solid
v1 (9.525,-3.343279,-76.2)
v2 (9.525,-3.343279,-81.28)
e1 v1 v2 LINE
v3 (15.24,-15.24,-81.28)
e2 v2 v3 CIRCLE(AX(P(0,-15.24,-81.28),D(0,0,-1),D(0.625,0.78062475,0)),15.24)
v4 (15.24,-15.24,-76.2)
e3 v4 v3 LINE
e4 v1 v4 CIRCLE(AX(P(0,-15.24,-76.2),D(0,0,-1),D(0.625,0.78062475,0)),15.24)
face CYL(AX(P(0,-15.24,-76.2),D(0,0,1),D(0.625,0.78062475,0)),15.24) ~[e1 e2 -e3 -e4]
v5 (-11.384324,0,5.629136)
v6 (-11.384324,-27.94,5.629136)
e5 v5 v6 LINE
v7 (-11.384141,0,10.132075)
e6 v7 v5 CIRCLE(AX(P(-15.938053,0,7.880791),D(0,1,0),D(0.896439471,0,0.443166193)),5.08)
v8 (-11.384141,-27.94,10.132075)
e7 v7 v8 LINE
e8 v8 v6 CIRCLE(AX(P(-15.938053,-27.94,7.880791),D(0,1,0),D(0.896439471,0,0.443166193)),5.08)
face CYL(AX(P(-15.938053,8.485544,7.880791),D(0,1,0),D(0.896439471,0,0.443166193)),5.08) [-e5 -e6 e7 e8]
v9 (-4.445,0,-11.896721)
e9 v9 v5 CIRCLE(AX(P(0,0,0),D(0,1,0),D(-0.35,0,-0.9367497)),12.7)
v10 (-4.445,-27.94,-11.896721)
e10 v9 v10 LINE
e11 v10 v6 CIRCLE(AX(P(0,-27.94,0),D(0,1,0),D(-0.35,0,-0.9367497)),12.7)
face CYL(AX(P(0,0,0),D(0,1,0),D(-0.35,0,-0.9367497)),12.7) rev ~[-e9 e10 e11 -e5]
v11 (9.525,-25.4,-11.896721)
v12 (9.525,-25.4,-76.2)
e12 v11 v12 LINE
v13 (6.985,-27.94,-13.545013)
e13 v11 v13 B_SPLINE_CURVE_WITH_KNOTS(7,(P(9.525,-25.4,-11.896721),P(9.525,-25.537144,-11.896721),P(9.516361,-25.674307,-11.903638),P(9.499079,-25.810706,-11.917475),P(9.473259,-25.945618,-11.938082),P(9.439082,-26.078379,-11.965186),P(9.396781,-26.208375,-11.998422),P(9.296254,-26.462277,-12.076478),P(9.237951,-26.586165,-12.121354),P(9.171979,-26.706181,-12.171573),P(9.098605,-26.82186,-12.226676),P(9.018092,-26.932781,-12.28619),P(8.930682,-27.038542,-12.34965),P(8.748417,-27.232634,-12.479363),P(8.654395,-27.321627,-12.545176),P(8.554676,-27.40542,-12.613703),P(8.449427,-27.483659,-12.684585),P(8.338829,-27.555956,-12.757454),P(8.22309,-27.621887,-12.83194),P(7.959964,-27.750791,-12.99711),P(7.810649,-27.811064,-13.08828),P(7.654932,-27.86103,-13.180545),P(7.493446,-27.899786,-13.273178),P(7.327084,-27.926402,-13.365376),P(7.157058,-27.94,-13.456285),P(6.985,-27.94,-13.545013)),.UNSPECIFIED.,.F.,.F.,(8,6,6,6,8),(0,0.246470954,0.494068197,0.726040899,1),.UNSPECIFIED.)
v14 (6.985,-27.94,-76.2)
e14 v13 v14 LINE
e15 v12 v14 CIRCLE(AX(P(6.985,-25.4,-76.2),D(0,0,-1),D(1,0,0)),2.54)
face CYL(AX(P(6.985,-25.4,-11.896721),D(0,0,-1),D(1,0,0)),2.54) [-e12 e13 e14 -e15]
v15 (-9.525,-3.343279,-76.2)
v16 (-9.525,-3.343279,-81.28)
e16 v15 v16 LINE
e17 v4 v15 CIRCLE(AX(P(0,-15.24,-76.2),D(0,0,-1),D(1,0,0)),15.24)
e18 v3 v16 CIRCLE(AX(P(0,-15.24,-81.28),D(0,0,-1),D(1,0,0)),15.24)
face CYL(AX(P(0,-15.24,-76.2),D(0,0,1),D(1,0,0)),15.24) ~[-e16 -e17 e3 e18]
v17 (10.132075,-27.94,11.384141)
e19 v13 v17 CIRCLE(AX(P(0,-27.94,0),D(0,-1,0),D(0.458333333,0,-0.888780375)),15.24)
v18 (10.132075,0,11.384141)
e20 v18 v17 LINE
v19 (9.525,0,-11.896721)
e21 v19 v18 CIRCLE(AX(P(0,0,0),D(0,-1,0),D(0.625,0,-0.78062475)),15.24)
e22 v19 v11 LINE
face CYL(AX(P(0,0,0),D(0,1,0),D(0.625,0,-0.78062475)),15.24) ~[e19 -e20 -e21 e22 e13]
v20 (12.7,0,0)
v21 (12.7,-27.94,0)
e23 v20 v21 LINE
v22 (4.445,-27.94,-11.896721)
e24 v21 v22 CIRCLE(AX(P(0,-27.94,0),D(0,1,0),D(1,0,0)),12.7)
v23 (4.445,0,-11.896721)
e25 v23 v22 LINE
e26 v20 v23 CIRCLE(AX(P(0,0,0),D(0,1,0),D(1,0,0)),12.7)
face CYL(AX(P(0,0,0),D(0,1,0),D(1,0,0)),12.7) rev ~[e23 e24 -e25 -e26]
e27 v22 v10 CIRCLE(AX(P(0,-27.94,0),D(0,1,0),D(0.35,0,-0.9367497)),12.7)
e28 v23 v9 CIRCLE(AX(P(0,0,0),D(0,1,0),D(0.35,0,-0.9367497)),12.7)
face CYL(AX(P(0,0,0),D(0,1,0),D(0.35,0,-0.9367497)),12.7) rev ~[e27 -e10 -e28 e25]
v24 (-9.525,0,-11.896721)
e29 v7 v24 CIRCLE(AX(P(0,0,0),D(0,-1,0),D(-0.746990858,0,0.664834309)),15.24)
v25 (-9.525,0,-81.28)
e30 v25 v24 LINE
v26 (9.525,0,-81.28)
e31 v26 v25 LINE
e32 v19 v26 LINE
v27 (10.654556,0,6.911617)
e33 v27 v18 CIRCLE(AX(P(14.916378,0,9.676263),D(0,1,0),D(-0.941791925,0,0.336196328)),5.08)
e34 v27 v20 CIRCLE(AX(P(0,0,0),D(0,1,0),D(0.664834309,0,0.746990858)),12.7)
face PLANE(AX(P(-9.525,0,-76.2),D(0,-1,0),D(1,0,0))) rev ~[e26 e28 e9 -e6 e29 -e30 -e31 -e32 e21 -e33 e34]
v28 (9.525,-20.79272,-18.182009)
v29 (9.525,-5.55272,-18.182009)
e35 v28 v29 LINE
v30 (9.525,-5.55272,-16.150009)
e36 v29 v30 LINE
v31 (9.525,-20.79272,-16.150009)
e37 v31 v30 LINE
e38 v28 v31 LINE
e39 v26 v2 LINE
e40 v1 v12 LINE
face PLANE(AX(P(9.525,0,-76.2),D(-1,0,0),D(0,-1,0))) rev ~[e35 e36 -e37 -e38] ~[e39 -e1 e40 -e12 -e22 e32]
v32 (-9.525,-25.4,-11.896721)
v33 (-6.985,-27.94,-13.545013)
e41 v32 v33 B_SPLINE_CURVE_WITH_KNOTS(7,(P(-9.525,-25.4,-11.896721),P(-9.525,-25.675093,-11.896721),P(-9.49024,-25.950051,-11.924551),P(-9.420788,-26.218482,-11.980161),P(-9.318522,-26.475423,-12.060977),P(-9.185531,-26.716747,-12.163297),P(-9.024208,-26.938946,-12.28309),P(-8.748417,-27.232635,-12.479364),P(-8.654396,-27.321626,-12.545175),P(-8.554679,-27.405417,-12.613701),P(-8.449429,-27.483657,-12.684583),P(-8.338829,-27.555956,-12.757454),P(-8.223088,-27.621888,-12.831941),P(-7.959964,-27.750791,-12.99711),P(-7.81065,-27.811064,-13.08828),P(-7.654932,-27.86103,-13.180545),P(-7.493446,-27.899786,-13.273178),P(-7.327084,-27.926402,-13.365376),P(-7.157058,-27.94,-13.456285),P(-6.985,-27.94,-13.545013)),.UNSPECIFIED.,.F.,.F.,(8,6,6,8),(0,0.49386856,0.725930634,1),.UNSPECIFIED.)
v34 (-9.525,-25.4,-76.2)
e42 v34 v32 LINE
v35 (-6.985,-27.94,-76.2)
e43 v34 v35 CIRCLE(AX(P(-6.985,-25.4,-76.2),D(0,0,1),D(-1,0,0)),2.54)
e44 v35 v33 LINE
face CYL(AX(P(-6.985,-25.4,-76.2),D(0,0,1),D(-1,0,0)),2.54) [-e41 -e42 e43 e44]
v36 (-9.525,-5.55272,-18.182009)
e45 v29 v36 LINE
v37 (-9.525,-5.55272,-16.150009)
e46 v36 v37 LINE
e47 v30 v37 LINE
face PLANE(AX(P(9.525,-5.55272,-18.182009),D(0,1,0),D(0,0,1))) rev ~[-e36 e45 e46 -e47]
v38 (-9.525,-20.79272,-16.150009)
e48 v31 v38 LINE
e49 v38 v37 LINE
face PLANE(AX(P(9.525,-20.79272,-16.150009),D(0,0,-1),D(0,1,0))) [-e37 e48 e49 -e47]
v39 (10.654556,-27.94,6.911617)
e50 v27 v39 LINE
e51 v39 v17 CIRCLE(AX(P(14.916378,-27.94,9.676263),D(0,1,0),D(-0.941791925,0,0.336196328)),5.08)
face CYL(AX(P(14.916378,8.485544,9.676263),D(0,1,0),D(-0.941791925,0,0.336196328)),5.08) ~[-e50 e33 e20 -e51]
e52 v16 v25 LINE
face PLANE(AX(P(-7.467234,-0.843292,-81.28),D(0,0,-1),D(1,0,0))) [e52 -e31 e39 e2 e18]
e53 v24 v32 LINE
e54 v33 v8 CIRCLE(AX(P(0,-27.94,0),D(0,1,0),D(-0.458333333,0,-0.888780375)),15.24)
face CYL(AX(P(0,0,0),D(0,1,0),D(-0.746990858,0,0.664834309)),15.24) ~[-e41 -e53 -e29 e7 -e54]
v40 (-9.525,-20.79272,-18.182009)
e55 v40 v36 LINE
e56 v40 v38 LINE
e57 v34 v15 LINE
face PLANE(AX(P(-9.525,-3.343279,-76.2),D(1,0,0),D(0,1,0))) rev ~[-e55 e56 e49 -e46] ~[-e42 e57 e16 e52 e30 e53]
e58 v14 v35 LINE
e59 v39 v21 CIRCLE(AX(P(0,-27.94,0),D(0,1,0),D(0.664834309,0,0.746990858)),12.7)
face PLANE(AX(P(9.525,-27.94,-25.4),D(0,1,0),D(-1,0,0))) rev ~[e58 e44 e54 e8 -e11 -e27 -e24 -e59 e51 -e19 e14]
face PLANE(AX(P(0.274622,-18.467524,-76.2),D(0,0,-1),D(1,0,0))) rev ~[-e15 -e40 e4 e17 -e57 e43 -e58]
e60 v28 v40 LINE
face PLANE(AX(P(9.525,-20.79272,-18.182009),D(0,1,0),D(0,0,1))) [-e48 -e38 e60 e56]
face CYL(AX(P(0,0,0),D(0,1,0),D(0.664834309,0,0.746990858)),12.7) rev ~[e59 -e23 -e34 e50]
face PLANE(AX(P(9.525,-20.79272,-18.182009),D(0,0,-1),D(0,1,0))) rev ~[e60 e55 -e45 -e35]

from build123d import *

# Parameters (mm, degrees)
F1_DEPTH    = 27.94
F3_DEPTH    = 50.8
F4_T1_DEPTH = 44.9110888614
F5_R        = 2.54
F6_W        = 15.24
F6_H        = 2.032
F7_DEPTH    = 25.4
F9_DEPTH    = 5.08
F10_DEPTH   = 5.08


# Not quite as in the source:
# - a fillet or chamfer that OpenCascade refuses, or shapes differently, is made with other operations: its cross-section is extruded or revolved along the edge and cut away or added


with BuildPart() as f1:
    # F0 (on Front) → F1 (new body)
    with BuildSketch(Plane.XZ):
        with BuildLine():
            ThreePointArc((-4.445, -11.8967211869), (-12.3269517561, -3.0555294801), (-9.4867838955, 8.4433957221))
            Line((-9.4867838955, 8.4433957221), (-11.3841406746, 10.1320748666))
            ThreePointArc((-11.3841406746, 10.1320748666), (-15.1860134607, -1.281637691), (-9.525, -11.8967211869))
            Line((-9.525, -11.8967211869), (-4.445, -11.8967211869))
        make_face()
        with BuildLine():
            Line((9.525, -11.8967211869), (4.445, -11.8967211869))
            ThreePointArc((4.445, -11.8967211869), (0, -12.7), (-4.445, -11.8967211869))
            Line((-4.445, -11.8967211869), (-9.525, -11.8967211869))
            ThreePointArc((-9.525, -11.8967211869), (0, -15.24), (9.525, -11.8967211869))
        make_face()
        with BuildLine():
            Line((9.525, -25.4), (9.525, -11.8967211869))
            ThreePointArc((9.525, -11.8967211869), (0, -15.24), (-9.525, -11.8967211869))
            Line((-9.525, -11.8967211869), (-9.525, -25.4))
            Line((-9.525, -25.4), (9.525, -25.4))
        make_face()
        with BuildLine():
            ThreePointArc((8.4433957221, 9.4867838955), (11.5870860373, 5.1989842435), (12.7, 0))
            ThreePointArc((12.7, 0), (10.4341147205, -7.2401139494), (4.445, -11.8967211869))
            Line((4.445, -11.8967211869), (9.525, -11.8967211869))
            ThreePointArc((9.525, -11.8967211869), (13.7371503595, -6.5991135768), (15.24, 0))
            ThreePointArc((15.24, 0), (13.9045032448, 6.2387810922), (10.1320748666, 11.3841406746))
            Line((10.1320748666, 11.3841406746), (8.4433957221, 9.4867838955))
        make_face()
    extrude(amount=F1_DEPTH)

    # F2 (on face) → F3 (join)
    with BuildSketch(Plane(origin=(0, 0, -25.4), x_dir=(1, 0, 0), z_dir=(0, 0, -1))):
        with BuildLine():
            Line((-9.525, 0), (-4.2597094971, 0))
            ThreePointArc((-4.2597094971, 0), (-7.0430625309, 1.175419304), (-9.525, 2.8983966834))
            Line((-9.525, 2.8983966834), (-9.525, 0))
        make_face()
        with BuildLine():
            Line((9.525, 2.8983966834), (9.525, 25.0416033166))
            ThreePointArc((9.525, 25.0416033166), (7.0430625309, 26.764580696), (4.2597094971, 27.94))
            Line((4.2597094971, 27.94), (-4.2597094971, 27.94))
            ThreePointArc((-4.2597094971, 27.94), (-7.0430625309, 26.764580696), (-9.525, 25.0416033166))
            Line((-9.525, 25.0416033166), (-9.525, 2.8983966834))
            ThreePointArc((-9.525, 2.8983966834), (-7.0430625309, 1.175419304), (-4.2597094971, 0))
            Line((-4.2597094971, 0), (4.2597094971, 0))
            ThreePointArc((4.2597094971, 0), (7.0430625309, 1.175419304), (9.525, 2.8983966834))
        make_face()
        with BuildLine():
            Line((9.525, 0), (9.525, 2.8983966834))
            ThreePointArc((9.525, 2.8983966834), (7.0430625309, 1.175419304), (4.2597094971, 0))
            Line((4.2597094971, 0), (9.525, 0))
        make_face()
        with BuildLine():
            ThreePointArc((-9.525, 25.0416033166), (-7.0430625309, 26.764580696), (-4.2597094971, 27.94))
            Line((-4.2597094971, 27.94), (-9.525, 27.94))
            Line((-9.525, 27.94), (-9.525, 25.0416033166))
        make_face()
        with BuildLine():
            ThreePointArc((4.2597094971, 27.94), (7.0430625309, 26.764580696), (9.525, 25.0416033166))
            Line((9.525, 25.0416033166), (9.525, 27.94))
            Line((9.525, 27.94), (4.2597094971, 27.94))
        make_face()
    extrude(amount=F3_DEPTH)

    # F4: fillet of radius 5.08 on 2 edges, made by hand

    # F4_s2 → F4_t1 (cut)
    with BuildSketch(Plane.XZ.offset(-8.4855444307)):
        with BuildLine():
            ThreePointArc((-11.3841406746, 10.1320748666), (-10.8580531921, 7.8805841193), (-11.3843237056, 5.6291361473))
            ThreePointArc((-11.3843237056, 5.6291361473), (-10.5299951264, 7.0999438475), (-9.4867838955, 8.4433957221))
            Line((-9.4867838955, 8.4433957221), (-11.3841406746, 10.1320748666))
        make_face()
        with BuildLine():
            ThreePointArc((10.1320748666, 11.3841406746), (9.8706902669, 9.0868255644), (10.6545556025, 6.9116166642))
            ThreePointArc((10.6545556025, 6.9116166642), (9.6353934931, 8.2734026998), (8.4433957221, 9.4867838955))
            Line((8.4433957221, 9.4867838955), (10.1320748666, 11.3841406746))
        make_face()
    extrude(amount=F4_T1_DEPTH, mode=Mode.SUBTRACT)

    # F5
    f5_edges = [f1.edges().sort_by_distance(p)[0] for p in [
        (-9.525, -27.94, -44.048361),
        (9.525, -27.94, -44.048361),
    ]]
    fillet(f5_edges, radius=F5_R)

    # F6 (on face) → F7 (cut)
    with BuildSketch(Plane.YZ.offset(9.525)):
        with Locations((-13.1727202785, -17.1660094585)):
            Rectangle(F6_W, F6_H)
    extrude(amount=-F7_DEPTH, mode=Mode.SUBTRACT)

    # F8 (on face) → F9 (join)
    with BuildSketch(Plane(origin=(0, 0, -76.2), x_dir=(1, 0, 0), z_dir=(0, 0, -1))):
        with BuildLine():
            ThreePointArc((9.525, 3.3432788131), (13.7371503595, 8.6408864232), (15.24, 15.24))
            ThreePointArc((15.24, 15.24), (-6.5991135768, 28.9771503595), (-9.525, 3.3432788131))
            Line((-9.525, 3.3432788131), (-9.525, 25.4))
            ThreePointArc((-9.525, 25.4), (-8.7810512242, 27.1960512242), (-6.985, 27.94))
            Line((-6.985, 27.94), (6.985, 27.94))
            ThreePointArc((6.985, 27.94), (8.7810512242, 27.1960512242), (9.525, 25.4))
            Line((9.525, 25.4), (9.525, 3.3432788131))
        make_face()
        with BuildLine():
            Line((-9.525, 25.4), (-9.525, 3.3432788131))
            ThreePointArc((-9.525, 3.3432788131), (-5.0473542134, 0.8600898666), (0, 0))
            ThreePointArc((0, 0), (5.0473542134, 0.8600898666), (9.525, 3.3432788131))
            Line((9.525, 3.3432788131), (9.525, 25.4))
            ThreePointArc((9.525, 25.4), (8.7810512242, 27.1960512242), (6.985, 27.94))
            Line((6.985, 27.94), (-6.985, 27.94))
            ThreePointArc((-6.985, 27.94), (-8.7810512242, 27.1960512242), (-9.525, 25.4))
        make_face()
    extrude(amount=F9_DEPTH)

    # F10 (add): faces of the model
    f10_faces = [f1.faces().sort_by_distance(p)[0] for p in [
        (-7.1991537336, -0.9808264472, -76.2),
        (7.1991537336, -0.9808264472, -76.2),
    ]]
    extrude(f10_faces, amount=F10_DEPTH)


solid = f1.part
